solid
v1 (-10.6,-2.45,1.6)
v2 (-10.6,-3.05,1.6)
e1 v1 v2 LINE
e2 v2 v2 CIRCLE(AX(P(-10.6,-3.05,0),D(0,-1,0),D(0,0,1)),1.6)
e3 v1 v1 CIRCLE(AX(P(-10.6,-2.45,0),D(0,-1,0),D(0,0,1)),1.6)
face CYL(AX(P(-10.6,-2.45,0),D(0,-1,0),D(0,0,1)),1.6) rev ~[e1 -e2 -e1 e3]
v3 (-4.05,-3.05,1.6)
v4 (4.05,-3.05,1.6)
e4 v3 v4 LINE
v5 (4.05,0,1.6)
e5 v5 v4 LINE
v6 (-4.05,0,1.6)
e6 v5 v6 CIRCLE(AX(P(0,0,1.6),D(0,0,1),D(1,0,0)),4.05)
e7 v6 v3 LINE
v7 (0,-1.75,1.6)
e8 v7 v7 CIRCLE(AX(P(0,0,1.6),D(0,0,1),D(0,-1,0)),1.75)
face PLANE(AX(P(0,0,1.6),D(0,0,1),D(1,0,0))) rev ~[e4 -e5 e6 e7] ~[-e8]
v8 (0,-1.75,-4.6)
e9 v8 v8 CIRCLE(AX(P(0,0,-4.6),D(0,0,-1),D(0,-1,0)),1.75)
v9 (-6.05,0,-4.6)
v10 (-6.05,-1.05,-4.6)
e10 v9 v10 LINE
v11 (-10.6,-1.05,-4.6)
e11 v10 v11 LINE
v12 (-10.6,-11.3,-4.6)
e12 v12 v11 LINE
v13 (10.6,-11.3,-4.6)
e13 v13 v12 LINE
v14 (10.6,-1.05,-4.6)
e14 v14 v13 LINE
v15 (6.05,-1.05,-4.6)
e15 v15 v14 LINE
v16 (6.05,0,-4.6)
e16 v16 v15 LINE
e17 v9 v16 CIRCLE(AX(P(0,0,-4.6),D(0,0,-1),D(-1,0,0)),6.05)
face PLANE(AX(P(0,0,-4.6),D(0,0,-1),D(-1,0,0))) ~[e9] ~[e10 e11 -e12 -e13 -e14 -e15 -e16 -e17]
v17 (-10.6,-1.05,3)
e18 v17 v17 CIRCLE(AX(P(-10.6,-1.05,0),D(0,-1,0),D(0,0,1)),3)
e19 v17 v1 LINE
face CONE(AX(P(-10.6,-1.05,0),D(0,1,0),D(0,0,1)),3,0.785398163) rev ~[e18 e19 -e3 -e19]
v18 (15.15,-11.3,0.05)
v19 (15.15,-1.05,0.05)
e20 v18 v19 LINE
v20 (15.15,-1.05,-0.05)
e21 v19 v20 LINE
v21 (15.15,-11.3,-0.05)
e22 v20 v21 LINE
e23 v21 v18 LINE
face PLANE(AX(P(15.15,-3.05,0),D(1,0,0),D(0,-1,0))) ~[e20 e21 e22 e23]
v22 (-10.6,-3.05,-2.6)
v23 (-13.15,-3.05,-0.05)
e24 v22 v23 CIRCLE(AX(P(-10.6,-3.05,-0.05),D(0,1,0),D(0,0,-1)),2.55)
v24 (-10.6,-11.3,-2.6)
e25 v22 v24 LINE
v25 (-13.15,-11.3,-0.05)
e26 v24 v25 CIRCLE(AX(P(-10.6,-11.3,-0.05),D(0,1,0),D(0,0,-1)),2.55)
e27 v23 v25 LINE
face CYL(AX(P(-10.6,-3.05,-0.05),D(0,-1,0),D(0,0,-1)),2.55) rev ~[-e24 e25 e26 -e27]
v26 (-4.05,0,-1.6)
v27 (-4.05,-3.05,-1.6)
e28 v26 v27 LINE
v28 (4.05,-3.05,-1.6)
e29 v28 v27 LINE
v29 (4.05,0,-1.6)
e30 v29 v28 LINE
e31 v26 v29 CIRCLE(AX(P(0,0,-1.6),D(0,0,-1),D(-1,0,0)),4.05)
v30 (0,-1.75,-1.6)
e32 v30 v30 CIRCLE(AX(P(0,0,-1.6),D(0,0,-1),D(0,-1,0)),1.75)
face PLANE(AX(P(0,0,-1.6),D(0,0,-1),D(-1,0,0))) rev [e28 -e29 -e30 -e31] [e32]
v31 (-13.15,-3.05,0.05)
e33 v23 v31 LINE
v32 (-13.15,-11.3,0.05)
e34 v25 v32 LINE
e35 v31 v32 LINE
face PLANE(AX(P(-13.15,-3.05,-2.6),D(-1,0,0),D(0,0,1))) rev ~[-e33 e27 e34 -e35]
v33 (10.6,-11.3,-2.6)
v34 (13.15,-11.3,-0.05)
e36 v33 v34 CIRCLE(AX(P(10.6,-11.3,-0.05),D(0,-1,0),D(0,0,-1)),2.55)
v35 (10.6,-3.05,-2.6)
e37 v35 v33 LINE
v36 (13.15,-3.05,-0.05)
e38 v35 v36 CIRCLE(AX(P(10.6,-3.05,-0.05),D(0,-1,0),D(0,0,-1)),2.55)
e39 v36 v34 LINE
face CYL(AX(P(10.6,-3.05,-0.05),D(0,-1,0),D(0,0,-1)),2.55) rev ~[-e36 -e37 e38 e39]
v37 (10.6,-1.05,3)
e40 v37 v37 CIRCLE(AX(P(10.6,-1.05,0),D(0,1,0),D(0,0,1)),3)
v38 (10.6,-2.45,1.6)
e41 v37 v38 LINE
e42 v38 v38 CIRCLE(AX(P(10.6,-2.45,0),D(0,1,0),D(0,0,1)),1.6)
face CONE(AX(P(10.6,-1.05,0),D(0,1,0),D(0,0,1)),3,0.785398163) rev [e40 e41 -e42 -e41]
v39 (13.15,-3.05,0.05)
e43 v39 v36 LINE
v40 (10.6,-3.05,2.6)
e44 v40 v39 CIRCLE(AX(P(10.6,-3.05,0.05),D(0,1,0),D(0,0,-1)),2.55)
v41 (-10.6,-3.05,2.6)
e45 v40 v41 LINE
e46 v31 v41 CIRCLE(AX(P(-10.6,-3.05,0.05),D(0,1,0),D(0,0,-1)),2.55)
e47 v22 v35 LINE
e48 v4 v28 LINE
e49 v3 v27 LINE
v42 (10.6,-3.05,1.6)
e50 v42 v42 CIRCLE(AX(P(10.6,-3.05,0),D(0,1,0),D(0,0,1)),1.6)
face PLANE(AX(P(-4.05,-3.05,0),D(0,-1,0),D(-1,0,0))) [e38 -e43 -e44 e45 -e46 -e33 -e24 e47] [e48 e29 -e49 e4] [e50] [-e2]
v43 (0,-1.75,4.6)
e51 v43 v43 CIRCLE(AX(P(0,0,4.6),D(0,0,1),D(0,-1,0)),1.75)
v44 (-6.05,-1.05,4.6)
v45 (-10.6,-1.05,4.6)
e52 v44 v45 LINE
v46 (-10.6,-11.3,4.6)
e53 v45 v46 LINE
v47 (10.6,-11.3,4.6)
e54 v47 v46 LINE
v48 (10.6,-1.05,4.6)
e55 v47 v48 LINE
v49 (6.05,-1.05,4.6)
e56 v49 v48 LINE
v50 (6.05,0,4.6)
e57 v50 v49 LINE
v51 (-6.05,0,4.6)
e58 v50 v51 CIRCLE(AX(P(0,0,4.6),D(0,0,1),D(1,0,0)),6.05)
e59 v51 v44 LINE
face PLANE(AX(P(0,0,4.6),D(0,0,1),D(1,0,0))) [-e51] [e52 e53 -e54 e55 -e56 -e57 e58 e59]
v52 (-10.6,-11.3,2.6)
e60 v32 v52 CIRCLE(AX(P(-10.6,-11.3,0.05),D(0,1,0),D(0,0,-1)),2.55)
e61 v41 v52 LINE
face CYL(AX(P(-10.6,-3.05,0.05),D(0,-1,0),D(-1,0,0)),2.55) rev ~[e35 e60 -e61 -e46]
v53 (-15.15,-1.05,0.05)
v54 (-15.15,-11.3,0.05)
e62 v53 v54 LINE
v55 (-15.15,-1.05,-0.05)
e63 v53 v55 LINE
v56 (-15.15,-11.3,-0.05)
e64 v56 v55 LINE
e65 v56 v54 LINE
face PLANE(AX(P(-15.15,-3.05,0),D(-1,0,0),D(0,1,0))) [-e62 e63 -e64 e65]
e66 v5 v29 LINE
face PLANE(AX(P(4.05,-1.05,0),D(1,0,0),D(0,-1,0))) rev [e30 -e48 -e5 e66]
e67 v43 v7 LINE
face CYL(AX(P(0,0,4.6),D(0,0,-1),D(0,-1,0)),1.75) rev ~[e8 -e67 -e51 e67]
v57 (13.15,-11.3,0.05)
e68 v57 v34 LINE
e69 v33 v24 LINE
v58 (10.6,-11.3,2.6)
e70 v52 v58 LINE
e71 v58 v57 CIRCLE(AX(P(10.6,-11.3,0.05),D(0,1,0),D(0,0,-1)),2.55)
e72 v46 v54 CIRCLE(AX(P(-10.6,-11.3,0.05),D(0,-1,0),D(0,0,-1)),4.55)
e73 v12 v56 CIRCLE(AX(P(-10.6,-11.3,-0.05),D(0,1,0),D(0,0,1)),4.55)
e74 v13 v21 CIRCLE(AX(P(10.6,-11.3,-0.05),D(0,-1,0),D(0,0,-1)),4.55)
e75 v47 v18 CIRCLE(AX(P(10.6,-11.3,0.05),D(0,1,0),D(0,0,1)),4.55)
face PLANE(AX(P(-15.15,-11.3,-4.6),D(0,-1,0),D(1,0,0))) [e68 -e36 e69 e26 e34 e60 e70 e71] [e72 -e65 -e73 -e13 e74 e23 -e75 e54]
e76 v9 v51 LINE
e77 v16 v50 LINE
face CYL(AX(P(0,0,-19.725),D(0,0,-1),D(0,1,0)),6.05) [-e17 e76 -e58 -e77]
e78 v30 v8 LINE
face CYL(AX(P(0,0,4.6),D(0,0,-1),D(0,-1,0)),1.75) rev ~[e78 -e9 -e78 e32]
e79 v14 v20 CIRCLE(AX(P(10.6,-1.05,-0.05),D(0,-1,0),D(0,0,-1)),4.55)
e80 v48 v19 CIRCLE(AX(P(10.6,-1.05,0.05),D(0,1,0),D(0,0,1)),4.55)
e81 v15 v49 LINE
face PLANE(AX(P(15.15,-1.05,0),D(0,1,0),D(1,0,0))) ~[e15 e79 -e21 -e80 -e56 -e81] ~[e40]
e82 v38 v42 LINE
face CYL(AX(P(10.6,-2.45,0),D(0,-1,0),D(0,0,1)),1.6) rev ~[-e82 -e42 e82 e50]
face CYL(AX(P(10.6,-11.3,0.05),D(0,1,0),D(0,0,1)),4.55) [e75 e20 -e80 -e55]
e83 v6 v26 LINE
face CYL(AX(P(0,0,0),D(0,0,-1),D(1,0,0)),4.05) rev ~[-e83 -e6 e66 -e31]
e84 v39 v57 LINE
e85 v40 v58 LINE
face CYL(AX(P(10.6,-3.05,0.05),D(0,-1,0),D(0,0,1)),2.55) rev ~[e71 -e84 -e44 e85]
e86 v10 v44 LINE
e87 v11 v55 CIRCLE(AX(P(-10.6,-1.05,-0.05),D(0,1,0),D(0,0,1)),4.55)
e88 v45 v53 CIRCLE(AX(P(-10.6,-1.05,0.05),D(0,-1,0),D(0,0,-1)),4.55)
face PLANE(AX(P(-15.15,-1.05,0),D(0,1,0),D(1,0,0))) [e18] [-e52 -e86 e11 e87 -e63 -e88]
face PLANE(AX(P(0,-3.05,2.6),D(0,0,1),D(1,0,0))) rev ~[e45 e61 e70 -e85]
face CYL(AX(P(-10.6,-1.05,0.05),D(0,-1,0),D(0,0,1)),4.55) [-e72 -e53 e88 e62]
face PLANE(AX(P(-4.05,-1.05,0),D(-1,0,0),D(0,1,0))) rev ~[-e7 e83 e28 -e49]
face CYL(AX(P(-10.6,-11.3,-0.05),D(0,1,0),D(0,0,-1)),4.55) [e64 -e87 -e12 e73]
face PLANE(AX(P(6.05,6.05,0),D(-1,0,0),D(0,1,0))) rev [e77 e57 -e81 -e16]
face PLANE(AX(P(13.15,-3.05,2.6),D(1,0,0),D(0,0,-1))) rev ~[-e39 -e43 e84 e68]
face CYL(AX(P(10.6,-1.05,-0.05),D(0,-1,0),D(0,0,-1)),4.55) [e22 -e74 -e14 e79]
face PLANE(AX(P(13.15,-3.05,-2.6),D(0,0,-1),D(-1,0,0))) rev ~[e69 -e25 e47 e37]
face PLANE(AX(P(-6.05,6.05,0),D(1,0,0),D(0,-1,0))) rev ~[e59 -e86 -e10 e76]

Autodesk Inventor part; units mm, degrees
ref_plane "YZ Plane" through (0, 0, 0) normal (1, 0, 0) x (0, 1, 0)
ref_plane "XZ Plane" through (0, 0, 0) normal (0, 1, 0) x (-1, 0, 0)
ref_plane "XY Plane" through (0, 0, 0) normal (0, 0, 1) x (1, 0, 0)
sketch "Эскиз1" plane through (0, 0, 0) normal (0, 0, 1) x (1, 0, 0)
  circle A0 centre (0, 0) radius 4.05
  line L0 (-6.05, -6.05) -> (6.05, -6.05)
  line L1 (6.05, -6.05) -> (6.05, 6.05)
  line L2 (6.05, 6.05) -> (-6.05, 6.05)
  line L3 (-6.05, 6.05) -> (-6.05, -6.05)
  line L4 (-6.05, -6.05) -> (6.05, 6.05) construction
  line L5 (6.05, -6.05) -> (-6.05, 6.05) construction
  line L6 (0, 4.05) -> (0, 6.05)
  line L7 (-4.05, 0) -> (-6.05, 0)
  line L8 (-15.15, -1.05) -> (0, -1.05)
  line L9 (0, -1.05) -> (0, -3.05)
  line L10 (0, -3.05) -> (-15.15, -3.05)
  line L11 (-15.15, -3.05) -> (-15.15, -1.05)
  line L12 (-4.05, 0) -> (4.05, 0)
  line L13 (4.05, 0) -> (4.05, -3.05)
  line L14 (4.05, -3.05) -> (-4.05, -3.05)
  line L15 (-4.05, -3.05) -> (-4.05, 0)
  line L16 (4.05, -3.05) -> (6.05, -3.05)
  line L17 (6.05, -3.05) -> (6.05, 0)
  line L18 (6.05, 0) -> (4.05, 0)
  line L19 (4.05, 0) -> (4.05, -3.05)
  point P0 (0, -2.05)
  point P1 (0, -6.05)
  point P2 (-6.05, -1.05)
  point P3 (-2.6646, -3.05)
  point P4 (-4.05, -3.05)
  point P5 (2.6646, -3.05)
  point P6 (-6.05, -3.05)
  point P7 (-4.05, -1.05)
  point P8 (-3.9115, -1.05)
  point P9 (-2.6646, -3.05)
  dimension "d0" = 8.1
  dimension "d1" = 2
  dimension "d2" = 2
  dimension "d3" = 9.1
  dimension "d4" = 2
  dimension "d5" = 3
extrude "Выдавливание1" add sketch "Эскиз1" along normal blind 1.6 contours A0 L7 L3 L2 L6 | L15 L8 L3 L7 | L15 L10 L3 L8 | L3 L10 L11 L8
sketch "Эскиз2" plane through (0, 0, 1.6) normal (0, 0, 1) x (1, 0, 0)
  line L0 (-6.05, -1.05) -> (-15.15, -1.05) projected
  line L1 (-15.15, -1.05) -> (-15.15, -3.05) projected
  line L2 (-15.15, -3.05) -> (-4.05, -3.05) projected
  line L3 (-4.05, -3.05) -> (-4.05, 0) projected
  arc A0 (0, 4.05) -> (-4.05, 0) centre (0, 0) ccw projected
  line L4 (0, 4.05) -> (0, 6.05) projected
  line L5 (0, 6.05) -> (-6.05, 6.05) projected
  line L6 (-6.05, 6.05) -> (-6.05, -1.05) projected
  line L7 (0, 4.05) -> (-4.05, 4.05)
  line L8 (-4.05, 4.05) -> (-4.05, -3.05)
  line L9 (-4.05, -3.05) -> (0, -3.05)
  line L10 (0, -3.05) -> (0, 4.05)
extrude "Выдавливание2" add sketch "Эскиз2" along normal blind 3
mirror "Зеркальное отражение1" about plane through (-9.6, -2.05, 0) normal (0, 0, -1)
sketch "Эскиз4" plane through (-15.15, -1.05, 4.6) normal (0, 1, 0) x (1, 0, 0)
  line L0 (0, 0) -> (0, 9.2) projected
  line L1 (0, 4.6) -> (9.1, 4.6)
  line L2 (9.1, 9.2) -> (9.1, 0) projected
  point P0 (15.15, 4.6)
  point P1 (4.55, 4.6)
hole "Отверстие2" at (-10.6, -1.05, 0) direction (0, -1, 0) diameter 3.2 end through all countersink diameter 6 countersink angle 90
mirror "Зеркальное отражение2" about plane through (0, 4.05, 0) normal (1, 0, 0)
sketch "Эскиз3" plane through (0, 0, 4.6) normal (0, 0, 1) x (1, 0, 0)
  arc A0 (2.6646, -3.05) -> (4.05, 0) centre (0, 0) ccw projected
  arc A1 (2.6646, -3.05) -> (4.05, 0) centre (0, 0) ccw projected
hole "Отверстие1" at (0, 0, 4.6) direction (0, 0, -1) diameter 3.5 end through all
fillet "Сопряжение1" radius 6.05 2 edges at (-6.05, 6.05, 0) (6.05, 6.05, 0)
sketch "Эскиз7" plane through (-15.15, -3.05, -4.6) normal (0, -1, 0) x (1, 0, 0)
  line L0 (30.3, 0) -> (0, 0) projected
  line L1 (0, 9.2) -> (30.3, 9.2) projected
  line L2 (13.4, 9.2) -> (16.9, 9.2) projected
  line L3 (15.15, 9.2) -> (15.15, 0)
  line L4 (28.3, 2) -> (2, 2)
  line L5 (2, 2) -> (2, 7.2)
  line L6 (2, 7.2) -> (28.3, 7.2)
  line L7 (28.3, 7.2) -> (28.3, 2)
  line L8 (28.3, 2) -> (2, 7.2) construction
  line L9 (2, 2) -> (28.3, 7.2) construction
  line L10 (0, 0) -> (0, 9.2) projected
  line L11 (30.3, 0) -> (30.3, 9.2) projected
  point P0 (15.15, 4.6)
  dimension "d29" = 2
  dimension "d30" = 2
extrude "Выдавливание4" add sketch "Эскиз7" along normal blind 8.25 contours L0 L3 L4 L7 L6 L1 L11 | L0 L10 L1 L3 L6 L5 L4
fillet "Сопряжение2" radius 4.55 4 edges at (15.15, -6.175, -4.6) (15.15, -6.175, 4.6) (-15.15, -6.175, -4.6) (-15.15, -6.175, 4.6)
fillet "Сопряжение3" radius 2.55 4 edges at (13.15, -7.175, -2.6) (13.15, -7.175, 2.6) (-13.15, -7.175, 2.6) (-13.15, -7.175, -2.6)
properties part number "Крышка стойки подшипника 3мм"
